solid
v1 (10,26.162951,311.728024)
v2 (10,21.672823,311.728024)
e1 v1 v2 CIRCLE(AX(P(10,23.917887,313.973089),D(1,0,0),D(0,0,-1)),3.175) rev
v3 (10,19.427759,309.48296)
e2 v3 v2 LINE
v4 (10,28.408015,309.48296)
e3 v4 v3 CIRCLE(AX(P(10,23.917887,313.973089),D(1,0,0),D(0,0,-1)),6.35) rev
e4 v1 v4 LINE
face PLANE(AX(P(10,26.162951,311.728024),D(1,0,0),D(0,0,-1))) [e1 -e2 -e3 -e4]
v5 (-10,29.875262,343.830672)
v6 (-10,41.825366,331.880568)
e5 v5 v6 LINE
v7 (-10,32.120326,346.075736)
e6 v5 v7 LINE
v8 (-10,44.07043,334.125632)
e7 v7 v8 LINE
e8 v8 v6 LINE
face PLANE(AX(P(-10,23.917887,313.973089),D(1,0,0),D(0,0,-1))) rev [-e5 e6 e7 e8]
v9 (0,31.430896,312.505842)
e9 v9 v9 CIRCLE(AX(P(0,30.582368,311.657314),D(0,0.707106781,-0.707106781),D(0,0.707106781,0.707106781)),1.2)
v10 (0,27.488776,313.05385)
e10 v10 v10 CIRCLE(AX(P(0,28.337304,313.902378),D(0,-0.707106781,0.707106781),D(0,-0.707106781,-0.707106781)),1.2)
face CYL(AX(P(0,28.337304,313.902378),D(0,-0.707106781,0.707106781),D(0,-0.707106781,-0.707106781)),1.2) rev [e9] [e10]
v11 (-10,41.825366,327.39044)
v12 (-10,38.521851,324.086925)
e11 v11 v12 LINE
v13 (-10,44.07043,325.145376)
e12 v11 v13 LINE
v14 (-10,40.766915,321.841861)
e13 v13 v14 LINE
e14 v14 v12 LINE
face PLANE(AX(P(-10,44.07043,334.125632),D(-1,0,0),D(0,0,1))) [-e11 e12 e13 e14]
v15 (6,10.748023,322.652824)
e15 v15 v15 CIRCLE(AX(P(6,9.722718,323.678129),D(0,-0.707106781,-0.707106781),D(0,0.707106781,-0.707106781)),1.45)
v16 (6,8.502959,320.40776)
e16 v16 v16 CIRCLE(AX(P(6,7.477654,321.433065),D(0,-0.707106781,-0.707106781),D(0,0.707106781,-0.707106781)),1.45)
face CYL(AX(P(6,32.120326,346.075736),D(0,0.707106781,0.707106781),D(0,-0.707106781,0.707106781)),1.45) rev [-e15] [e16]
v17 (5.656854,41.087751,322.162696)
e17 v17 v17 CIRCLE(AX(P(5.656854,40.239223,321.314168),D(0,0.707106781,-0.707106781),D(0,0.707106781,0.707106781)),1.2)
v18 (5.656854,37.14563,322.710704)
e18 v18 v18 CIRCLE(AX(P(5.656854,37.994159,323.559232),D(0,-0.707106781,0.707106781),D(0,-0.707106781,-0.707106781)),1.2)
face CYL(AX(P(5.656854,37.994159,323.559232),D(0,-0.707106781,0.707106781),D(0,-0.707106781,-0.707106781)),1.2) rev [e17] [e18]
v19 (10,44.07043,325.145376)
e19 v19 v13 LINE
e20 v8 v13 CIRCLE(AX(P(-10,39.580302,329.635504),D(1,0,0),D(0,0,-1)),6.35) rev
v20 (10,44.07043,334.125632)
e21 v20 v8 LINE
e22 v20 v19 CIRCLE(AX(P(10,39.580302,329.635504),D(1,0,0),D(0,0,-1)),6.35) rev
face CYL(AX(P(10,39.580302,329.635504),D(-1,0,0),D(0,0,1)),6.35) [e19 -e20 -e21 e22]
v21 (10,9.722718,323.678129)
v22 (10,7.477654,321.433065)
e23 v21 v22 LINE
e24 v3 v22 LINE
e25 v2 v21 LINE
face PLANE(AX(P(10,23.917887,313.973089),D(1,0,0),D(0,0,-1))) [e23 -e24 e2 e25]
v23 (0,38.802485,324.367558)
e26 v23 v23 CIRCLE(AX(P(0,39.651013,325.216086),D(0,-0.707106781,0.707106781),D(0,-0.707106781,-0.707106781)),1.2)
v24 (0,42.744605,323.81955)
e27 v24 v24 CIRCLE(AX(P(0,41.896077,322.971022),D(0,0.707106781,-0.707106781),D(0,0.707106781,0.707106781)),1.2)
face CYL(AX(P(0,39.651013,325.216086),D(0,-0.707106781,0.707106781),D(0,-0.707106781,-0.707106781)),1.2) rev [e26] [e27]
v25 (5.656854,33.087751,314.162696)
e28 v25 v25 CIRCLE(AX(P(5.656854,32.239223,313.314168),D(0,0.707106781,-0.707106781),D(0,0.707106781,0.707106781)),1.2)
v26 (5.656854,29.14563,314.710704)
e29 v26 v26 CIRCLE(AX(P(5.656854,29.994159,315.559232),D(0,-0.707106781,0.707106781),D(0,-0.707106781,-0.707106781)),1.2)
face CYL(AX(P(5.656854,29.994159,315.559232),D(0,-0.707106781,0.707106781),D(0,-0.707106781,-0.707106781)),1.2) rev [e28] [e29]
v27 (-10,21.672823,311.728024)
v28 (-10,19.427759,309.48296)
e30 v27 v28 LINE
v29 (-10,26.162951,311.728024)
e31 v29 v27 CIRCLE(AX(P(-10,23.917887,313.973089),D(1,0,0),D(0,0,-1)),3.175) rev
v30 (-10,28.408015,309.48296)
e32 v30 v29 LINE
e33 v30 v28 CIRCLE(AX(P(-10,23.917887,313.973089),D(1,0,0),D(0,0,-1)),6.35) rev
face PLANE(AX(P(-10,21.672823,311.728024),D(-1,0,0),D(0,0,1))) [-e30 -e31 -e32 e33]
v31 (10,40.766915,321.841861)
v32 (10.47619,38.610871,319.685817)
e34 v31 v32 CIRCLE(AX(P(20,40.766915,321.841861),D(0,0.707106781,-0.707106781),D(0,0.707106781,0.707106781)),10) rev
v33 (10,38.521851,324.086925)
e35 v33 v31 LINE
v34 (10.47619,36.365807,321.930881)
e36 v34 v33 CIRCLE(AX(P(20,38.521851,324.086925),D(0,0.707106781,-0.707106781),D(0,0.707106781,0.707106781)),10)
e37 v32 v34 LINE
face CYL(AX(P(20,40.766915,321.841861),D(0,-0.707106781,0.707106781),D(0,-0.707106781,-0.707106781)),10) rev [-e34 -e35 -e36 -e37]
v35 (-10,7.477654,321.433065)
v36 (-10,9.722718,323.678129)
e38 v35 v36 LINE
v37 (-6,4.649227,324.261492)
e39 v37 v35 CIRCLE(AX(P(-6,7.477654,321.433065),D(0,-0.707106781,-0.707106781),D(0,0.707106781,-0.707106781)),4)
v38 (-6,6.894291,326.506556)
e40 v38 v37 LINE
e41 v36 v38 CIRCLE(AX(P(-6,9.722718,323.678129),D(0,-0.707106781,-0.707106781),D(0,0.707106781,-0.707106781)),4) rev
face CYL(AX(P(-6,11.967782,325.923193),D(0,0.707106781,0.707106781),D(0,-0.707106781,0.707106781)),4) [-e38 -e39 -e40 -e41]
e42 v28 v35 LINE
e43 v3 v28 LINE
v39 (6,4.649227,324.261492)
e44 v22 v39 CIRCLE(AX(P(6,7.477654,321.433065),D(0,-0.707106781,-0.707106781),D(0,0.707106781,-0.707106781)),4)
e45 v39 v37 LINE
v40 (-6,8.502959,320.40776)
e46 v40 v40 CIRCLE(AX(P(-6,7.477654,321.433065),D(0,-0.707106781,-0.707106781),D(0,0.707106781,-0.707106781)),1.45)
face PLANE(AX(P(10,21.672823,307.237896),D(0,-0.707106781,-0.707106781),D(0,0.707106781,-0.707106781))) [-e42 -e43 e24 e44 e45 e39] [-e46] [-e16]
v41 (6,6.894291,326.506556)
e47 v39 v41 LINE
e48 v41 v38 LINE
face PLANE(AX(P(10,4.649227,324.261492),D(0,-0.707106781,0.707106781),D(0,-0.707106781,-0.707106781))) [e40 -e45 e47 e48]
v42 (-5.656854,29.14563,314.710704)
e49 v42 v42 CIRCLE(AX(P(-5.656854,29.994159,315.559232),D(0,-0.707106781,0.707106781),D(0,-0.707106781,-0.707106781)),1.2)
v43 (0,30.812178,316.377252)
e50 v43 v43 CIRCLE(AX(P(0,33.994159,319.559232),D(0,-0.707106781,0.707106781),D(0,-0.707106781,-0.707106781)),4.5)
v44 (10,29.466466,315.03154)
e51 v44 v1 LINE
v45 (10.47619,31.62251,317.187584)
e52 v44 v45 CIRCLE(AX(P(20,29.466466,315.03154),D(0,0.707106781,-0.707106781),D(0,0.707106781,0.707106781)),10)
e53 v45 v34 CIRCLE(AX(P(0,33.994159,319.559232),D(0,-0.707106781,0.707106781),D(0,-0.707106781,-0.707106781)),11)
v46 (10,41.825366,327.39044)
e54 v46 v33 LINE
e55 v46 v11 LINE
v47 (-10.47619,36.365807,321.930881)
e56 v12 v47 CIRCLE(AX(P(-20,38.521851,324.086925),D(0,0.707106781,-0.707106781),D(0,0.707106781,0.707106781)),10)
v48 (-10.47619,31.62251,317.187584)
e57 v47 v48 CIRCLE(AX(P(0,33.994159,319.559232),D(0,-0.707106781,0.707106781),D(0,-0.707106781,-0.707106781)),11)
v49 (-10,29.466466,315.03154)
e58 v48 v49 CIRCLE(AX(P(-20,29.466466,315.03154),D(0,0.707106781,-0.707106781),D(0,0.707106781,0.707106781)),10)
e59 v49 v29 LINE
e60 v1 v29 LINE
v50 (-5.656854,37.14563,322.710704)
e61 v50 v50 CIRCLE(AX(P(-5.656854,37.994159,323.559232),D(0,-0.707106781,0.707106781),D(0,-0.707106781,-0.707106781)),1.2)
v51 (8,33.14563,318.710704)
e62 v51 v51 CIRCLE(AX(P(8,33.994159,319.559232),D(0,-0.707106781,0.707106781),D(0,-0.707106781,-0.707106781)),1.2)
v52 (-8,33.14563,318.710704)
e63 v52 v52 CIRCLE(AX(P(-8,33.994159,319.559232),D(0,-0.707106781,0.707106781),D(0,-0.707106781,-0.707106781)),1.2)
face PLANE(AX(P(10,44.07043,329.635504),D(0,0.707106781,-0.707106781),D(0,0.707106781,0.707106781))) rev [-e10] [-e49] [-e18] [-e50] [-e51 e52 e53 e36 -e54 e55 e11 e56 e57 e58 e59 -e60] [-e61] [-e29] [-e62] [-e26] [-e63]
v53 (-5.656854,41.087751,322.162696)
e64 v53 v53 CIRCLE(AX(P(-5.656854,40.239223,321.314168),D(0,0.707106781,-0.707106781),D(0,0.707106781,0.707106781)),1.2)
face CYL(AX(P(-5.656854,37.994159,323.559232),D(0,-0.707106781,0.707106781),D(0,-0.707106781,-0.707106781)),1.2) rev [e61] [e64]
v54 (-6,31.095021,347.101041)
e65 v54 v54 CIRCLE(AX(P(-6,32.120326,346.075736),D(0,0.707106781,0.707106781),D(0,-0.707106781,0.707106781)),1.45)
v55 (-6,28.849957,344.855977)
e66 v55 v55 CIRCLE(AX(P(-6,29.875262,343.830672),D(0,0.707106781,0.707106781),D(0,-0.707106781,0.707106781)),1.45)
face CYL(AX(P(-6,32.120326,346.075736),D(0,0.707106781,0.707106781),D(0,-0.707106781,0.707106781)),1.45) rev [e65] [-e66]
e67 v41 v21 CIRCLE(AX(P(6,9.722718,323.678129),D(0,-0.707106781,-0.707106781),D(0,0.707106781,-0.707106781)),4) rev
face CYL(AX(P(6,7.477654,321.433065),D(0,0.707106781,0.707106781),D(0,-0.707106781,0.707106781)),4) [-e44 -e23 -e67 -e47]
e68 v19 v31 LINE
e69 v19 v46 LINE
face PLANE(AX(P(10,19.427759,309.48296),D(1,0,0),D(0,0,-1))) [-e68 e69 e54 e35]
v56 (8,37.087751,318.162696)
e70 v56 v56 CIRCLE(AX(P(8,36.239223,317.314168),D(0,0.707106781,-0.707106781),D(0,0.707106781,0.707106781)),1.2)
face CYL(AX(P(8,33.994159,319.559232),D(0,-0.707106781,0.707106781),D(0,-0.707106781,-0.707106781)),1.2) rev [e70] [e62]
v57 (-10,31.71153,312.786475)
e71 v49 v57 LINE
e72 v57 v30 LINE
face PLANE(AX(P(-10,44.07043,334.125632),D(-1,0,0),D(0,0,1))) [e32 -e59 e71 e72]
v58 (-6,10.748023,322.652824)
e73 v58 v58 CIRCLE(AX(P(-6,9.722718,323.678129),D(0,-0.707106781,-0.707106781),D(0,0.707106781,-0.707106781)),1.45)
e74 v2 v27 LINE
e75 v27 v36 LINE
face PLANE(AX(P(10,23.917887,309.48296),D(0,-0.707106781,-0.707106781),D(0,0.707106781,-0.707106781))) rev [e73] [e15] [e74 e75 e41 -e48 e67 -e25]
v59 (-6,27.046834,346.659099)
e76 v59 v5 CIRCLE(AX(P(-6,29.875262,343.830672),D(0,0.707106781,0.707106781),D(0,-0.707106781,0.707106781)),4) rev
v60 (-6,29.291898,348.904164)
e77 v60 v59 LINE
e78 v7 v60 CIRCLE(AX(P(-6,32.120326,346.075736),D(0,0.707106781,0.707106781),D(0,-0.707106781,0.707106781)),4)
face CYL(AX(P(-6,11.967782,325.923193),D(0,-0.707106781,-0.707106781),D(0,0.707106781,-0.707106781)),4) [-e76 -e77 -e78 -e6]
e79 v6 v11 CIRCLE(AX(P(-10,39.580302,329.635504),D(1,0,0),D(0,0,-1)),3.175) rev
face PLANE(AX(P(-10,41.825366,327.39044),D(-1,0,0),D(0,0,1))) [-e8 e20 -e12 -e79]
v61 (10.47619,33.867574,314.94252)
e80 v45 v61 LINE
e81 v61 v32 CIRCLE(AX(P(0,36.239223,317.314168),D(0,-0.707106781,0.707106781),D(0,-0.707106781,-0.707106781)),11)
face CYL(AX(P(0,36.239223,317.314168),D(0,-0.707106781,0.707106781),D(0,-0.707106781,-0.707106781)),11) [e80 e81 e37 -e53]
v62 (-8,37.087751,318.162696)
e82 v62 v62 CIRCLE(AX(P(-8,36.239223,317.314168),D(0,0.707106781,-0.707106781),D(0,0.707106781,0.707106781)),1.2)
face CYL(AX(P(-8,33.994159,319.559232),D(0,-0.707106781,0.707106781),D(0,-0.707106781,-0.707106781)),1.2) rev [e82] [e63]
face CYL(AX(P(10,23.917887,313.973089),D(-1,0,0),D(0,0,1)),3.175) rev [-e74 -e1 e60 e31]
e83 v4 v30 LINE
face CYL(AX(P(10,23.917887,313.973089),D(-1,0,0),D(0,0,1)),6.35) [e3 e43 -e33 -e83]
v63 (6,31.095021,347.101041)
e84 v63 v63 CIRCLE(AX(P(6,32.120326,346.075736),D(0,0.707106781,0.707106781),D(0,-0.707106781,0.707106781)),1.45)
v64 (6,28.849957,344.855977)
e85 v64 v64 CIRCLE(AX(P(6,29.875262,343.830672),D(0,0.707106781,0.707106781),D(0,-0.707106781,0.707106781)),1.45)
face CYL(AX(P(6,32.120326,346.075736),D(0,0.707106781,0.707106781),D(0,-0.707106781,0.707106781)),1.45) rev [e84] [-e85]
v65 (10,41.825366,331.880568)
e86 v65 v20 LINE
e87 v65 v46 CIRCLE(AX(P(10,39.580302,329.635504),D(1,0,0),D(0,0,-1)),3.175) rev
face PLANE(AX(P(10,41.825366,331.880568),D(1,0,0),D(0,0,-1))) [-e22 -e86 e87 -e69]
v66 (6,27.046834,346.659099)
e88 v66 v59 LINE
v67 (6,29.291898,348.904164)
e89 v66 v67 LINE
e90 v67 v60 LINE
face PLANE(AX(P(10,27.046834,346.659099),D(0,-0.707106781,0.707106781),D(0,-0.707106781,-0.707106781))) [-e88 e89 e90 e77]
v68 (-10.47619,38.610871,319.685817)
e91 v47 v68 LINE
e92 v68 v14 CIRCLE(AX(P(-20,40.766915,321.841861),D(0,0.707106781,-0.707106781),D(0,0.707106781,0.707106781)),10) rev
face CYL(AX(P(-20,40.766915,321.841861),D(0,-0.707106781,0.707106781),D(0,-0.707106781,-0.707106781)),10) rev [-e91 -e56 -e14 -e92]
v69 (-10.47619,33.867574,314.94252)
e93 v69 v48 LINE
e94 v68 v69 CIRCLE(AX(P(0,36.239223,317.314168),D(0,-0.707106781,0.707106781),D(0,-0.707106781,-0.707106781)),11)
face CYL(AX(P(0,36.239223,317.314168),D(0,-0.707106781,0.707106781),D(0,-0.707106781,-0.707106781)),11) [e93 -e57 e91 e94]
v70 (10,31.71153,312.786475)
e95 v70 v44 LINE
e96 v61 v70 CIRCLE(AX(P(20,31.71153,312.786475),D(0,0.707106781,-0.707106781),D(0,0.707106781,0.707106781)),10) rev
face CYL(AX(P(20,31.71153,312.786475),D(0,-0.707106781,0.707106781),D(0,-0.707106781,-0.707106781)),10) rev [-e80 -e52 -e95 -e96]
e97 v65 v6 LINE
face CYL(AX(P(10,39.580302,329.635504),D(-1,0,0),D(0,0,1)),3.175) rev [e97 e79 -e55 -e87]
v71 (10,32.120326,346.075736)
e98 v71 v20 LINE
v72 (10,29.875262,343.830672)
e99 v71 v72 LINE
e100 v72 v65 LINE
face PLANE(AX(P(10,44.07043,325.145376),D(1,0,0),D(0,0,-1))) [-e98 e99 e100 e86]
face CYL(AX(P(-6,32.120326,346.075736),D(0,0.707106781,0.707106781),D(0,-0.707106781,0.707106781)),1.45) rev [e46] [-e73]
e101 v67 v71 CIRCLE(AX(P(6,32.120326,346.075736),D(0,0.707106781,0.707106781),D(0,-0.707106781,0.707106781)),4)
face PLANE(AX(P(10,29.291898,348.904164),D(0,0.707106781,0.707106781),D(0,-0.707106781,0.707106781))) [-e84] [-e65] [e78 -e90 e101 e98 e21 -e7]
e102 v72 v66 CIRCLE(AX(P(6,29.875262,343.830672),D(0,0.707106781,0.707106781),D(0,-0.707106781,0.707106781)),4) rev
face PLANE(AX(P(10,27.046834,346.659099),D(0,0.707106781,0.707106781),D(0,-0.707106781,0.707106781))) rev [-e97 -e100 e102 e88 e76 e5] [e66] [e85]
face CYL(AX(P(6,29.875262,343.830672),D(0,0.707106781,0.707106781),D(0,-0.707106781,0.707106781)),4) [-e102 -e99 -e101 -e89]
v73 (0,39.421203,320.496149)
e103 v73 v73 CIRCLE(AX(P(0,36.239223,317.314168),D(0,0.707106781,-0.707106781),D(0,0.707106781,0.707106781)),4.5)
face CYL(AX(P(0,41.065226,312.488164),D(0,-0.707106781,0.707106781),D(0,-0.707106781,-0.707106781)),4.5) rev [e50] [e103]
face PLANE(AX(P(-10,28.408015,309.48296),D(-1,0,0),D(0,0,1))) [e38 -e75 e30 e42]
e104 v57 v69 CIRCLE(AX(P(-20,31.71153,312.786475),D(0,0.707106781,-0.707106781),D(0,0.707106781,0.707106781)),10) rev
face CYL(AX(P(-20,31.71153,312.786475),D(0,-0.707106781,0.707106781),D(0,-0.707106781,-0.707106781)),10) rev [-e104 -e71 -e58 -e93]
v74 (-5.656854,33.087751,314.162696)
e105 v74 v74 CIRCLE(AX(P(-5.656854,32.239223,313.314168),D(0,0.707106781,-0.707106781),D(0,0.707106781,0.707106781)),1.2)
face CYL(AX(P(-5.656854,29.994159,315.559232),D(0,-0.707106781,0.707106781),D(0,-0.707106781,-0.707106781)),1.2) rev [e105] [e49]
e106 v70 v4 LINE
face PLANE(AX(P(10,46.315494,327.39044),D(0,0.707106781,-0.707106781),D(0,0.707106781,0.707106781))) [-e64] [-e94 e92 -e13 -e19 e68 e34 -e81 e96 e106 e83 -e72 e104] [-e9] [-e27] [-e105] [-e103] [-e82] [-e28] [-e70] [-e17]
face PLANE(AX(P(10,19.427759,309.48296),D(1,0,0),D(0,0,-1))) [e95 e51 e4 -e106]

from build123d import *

# Parameters (mm, degrees)
BASE_FLANGE2_DEPTH      = 10
BASE_FLANGE2_DEPTH_BACK = 10
TAB1_DEPTH              = 3.175
FILLET2_R               = 10
M2_5_CLEARANCE_HOLE1_D  = 2.9
FILLET1_R               = 4
M2_CLEARANCE_HOLE2_D    = 2.4
SKETCH24_R              = 4.5
CUT_EXTRUDE1_DEPTH      = 10


# Sheet-metal steps are written as plain solids
with BuildPart() as part:
    # Sketch9 → Base-Flange2 (new, two sides: drawn at the far end of the back side and taken through both)
    with BuildSketch(Plane(origin=(0, 0, 0), x_dir=(0, 0, -1), z_dir=(1, 0, 0)).offset(-BASE_FLANGE2_DEPTH_BACK)):
        with BuildLine():
            Line((-346.659099477, 27.04683438), (-331.88056775, 41.825366107))
            ThreePointArc((-331.88056775, 41.825366107), (-329.63550372, 42.755302077), (-327.390439689, 41.825366107))
            Line((-327.390439689, 41.825366107), (-311.728024486, 26.162950904))
            ThreePointArc((-311.728024486, 26.162950904), (-310.798088516, 23.917886874), (-311.728024486, 21.672822843))
            Line((-311.728024486, 21.672822843), (-326.506556213, 6.894291117))
            Line((-326.506556213, 6.894291117), (-324.261492183, 4.649227086))
            Line((-324.261492183, 4.649227086), (-309.482960456, 19.427758813))
            ThreePointArc((-309.482960456, 19.427758813), (-307.623088516, 23.917886874), (-309.482960456, 28.408014934))
            Line((-309.482960456, 28.408014934), (-325.145375659, 44.070430137))
            ThreePointArc((-325.145375659, 44.070430137), (-329.63550372, 45.930302077), (-334.12563178, 44.070430137))
            Line((-334.12563178, 44.070430137), (-348.904163507, 29.291898411))
            Line((-348.904163507, 29.291898411), (-346.659099477, 27.04683438))
        make_face()
    extrude(amount=BASE_FLANGE2_DEPTH + BASE_FLANGE2_DEPTH_BACK)

    # Sketch25 → Tab1 (add)
    with BuildSketch(Plane(origin=(0, -142.782536791, 142.782536791), x_dir=(1, 0, 0), z_dir=(0, -0.7071067811865472, 0.7071067811865479))):
        with BuildLine():
            Line((-10, 254.582575695), (10, 254.582575695))
            ThreePointArc((10, 254.582575695), (11, 250), (10, 245.417424305))
            Line((10, 245.417424305), (-10, 245.417424305))
            ThreePointArc((-10, 245.417424305), (-11, 250), (-10, 254.582575695))
        make_face()
    extrude(amount=-TAB1_DEPTH)

    # Fillet2
    fillet2_edges = [part.edges().sort_by_distance(p)[0] for p in [
        (-10, 31.876320171, 315.196329723),
        (-10, 38.35706087, 321.677070422),
        (10, 38.35706087, 321.677070422),
        (10, 31.876320171, 315.196329723),
    ]]
    fillet(fillet2_edges, radius=FILLET2_R)

    # M2.5 Clearance Hole1 (through all)
    with Locations(Plane(origin=(0, 189.098030959, 189.098030959), x_dir=(1, 0, 0), z_dir=(0, 0.7071067811865477, 0.7071067811865475))):
        with Locations((-6, -222), (6, -222)):
            Hole(M2_5_CLEARANCE_HOLE1_D / 2)

    # Fillet1
    fillet1_edges = [part.edges().sort_by_distance(p)[0] for p in [
        (-10, 28.169366396, 347.781631492),
        (10, 28.169366396, 347.781631492),
        (-10, 5.771759101, 325.384024198),
        (10, 5.771759101, 325.384024198),
    ]]
    fillet(fillet1_edges, radius=FILLET1_R)

    # M2 Clearance Hole2 (through all)
    with Locations(Plane(origin=(0, -142.782536791, 142.782536791), x_dir=(1, 0, 0), z_dir=(0, -0.7071067811865472, 0.7071067811865479))):
        with Locations((0, 258), (5.656854249, 255.656854249), (8, 250), (5.656854249, 244.343145751), (0, 242), (-5.656854249, 244.343145751), (-8, 250), (-5.656854249, 255.656854249)):
            Hole(M2_CLEARANCE_HOLE2_D / 2)

    # Sketch24 → Cut-Extrude1 (cut)
    with BuildSketch(Plane(origin=(0, -142.782536791, 142.782536791), x_dir=(1, 0, 0), z_dir=(0, -0.7071067811865472, 0.7071067811865479))):
        with Locations(Location((0, 250, 0), (0, 0, 270))):
            Circle(SKETCH24_R)
    extrude(amount=-CUT_EXTRUDE1_DEPTH, mode=Mode.SUBTRACT)


solid = part.part
